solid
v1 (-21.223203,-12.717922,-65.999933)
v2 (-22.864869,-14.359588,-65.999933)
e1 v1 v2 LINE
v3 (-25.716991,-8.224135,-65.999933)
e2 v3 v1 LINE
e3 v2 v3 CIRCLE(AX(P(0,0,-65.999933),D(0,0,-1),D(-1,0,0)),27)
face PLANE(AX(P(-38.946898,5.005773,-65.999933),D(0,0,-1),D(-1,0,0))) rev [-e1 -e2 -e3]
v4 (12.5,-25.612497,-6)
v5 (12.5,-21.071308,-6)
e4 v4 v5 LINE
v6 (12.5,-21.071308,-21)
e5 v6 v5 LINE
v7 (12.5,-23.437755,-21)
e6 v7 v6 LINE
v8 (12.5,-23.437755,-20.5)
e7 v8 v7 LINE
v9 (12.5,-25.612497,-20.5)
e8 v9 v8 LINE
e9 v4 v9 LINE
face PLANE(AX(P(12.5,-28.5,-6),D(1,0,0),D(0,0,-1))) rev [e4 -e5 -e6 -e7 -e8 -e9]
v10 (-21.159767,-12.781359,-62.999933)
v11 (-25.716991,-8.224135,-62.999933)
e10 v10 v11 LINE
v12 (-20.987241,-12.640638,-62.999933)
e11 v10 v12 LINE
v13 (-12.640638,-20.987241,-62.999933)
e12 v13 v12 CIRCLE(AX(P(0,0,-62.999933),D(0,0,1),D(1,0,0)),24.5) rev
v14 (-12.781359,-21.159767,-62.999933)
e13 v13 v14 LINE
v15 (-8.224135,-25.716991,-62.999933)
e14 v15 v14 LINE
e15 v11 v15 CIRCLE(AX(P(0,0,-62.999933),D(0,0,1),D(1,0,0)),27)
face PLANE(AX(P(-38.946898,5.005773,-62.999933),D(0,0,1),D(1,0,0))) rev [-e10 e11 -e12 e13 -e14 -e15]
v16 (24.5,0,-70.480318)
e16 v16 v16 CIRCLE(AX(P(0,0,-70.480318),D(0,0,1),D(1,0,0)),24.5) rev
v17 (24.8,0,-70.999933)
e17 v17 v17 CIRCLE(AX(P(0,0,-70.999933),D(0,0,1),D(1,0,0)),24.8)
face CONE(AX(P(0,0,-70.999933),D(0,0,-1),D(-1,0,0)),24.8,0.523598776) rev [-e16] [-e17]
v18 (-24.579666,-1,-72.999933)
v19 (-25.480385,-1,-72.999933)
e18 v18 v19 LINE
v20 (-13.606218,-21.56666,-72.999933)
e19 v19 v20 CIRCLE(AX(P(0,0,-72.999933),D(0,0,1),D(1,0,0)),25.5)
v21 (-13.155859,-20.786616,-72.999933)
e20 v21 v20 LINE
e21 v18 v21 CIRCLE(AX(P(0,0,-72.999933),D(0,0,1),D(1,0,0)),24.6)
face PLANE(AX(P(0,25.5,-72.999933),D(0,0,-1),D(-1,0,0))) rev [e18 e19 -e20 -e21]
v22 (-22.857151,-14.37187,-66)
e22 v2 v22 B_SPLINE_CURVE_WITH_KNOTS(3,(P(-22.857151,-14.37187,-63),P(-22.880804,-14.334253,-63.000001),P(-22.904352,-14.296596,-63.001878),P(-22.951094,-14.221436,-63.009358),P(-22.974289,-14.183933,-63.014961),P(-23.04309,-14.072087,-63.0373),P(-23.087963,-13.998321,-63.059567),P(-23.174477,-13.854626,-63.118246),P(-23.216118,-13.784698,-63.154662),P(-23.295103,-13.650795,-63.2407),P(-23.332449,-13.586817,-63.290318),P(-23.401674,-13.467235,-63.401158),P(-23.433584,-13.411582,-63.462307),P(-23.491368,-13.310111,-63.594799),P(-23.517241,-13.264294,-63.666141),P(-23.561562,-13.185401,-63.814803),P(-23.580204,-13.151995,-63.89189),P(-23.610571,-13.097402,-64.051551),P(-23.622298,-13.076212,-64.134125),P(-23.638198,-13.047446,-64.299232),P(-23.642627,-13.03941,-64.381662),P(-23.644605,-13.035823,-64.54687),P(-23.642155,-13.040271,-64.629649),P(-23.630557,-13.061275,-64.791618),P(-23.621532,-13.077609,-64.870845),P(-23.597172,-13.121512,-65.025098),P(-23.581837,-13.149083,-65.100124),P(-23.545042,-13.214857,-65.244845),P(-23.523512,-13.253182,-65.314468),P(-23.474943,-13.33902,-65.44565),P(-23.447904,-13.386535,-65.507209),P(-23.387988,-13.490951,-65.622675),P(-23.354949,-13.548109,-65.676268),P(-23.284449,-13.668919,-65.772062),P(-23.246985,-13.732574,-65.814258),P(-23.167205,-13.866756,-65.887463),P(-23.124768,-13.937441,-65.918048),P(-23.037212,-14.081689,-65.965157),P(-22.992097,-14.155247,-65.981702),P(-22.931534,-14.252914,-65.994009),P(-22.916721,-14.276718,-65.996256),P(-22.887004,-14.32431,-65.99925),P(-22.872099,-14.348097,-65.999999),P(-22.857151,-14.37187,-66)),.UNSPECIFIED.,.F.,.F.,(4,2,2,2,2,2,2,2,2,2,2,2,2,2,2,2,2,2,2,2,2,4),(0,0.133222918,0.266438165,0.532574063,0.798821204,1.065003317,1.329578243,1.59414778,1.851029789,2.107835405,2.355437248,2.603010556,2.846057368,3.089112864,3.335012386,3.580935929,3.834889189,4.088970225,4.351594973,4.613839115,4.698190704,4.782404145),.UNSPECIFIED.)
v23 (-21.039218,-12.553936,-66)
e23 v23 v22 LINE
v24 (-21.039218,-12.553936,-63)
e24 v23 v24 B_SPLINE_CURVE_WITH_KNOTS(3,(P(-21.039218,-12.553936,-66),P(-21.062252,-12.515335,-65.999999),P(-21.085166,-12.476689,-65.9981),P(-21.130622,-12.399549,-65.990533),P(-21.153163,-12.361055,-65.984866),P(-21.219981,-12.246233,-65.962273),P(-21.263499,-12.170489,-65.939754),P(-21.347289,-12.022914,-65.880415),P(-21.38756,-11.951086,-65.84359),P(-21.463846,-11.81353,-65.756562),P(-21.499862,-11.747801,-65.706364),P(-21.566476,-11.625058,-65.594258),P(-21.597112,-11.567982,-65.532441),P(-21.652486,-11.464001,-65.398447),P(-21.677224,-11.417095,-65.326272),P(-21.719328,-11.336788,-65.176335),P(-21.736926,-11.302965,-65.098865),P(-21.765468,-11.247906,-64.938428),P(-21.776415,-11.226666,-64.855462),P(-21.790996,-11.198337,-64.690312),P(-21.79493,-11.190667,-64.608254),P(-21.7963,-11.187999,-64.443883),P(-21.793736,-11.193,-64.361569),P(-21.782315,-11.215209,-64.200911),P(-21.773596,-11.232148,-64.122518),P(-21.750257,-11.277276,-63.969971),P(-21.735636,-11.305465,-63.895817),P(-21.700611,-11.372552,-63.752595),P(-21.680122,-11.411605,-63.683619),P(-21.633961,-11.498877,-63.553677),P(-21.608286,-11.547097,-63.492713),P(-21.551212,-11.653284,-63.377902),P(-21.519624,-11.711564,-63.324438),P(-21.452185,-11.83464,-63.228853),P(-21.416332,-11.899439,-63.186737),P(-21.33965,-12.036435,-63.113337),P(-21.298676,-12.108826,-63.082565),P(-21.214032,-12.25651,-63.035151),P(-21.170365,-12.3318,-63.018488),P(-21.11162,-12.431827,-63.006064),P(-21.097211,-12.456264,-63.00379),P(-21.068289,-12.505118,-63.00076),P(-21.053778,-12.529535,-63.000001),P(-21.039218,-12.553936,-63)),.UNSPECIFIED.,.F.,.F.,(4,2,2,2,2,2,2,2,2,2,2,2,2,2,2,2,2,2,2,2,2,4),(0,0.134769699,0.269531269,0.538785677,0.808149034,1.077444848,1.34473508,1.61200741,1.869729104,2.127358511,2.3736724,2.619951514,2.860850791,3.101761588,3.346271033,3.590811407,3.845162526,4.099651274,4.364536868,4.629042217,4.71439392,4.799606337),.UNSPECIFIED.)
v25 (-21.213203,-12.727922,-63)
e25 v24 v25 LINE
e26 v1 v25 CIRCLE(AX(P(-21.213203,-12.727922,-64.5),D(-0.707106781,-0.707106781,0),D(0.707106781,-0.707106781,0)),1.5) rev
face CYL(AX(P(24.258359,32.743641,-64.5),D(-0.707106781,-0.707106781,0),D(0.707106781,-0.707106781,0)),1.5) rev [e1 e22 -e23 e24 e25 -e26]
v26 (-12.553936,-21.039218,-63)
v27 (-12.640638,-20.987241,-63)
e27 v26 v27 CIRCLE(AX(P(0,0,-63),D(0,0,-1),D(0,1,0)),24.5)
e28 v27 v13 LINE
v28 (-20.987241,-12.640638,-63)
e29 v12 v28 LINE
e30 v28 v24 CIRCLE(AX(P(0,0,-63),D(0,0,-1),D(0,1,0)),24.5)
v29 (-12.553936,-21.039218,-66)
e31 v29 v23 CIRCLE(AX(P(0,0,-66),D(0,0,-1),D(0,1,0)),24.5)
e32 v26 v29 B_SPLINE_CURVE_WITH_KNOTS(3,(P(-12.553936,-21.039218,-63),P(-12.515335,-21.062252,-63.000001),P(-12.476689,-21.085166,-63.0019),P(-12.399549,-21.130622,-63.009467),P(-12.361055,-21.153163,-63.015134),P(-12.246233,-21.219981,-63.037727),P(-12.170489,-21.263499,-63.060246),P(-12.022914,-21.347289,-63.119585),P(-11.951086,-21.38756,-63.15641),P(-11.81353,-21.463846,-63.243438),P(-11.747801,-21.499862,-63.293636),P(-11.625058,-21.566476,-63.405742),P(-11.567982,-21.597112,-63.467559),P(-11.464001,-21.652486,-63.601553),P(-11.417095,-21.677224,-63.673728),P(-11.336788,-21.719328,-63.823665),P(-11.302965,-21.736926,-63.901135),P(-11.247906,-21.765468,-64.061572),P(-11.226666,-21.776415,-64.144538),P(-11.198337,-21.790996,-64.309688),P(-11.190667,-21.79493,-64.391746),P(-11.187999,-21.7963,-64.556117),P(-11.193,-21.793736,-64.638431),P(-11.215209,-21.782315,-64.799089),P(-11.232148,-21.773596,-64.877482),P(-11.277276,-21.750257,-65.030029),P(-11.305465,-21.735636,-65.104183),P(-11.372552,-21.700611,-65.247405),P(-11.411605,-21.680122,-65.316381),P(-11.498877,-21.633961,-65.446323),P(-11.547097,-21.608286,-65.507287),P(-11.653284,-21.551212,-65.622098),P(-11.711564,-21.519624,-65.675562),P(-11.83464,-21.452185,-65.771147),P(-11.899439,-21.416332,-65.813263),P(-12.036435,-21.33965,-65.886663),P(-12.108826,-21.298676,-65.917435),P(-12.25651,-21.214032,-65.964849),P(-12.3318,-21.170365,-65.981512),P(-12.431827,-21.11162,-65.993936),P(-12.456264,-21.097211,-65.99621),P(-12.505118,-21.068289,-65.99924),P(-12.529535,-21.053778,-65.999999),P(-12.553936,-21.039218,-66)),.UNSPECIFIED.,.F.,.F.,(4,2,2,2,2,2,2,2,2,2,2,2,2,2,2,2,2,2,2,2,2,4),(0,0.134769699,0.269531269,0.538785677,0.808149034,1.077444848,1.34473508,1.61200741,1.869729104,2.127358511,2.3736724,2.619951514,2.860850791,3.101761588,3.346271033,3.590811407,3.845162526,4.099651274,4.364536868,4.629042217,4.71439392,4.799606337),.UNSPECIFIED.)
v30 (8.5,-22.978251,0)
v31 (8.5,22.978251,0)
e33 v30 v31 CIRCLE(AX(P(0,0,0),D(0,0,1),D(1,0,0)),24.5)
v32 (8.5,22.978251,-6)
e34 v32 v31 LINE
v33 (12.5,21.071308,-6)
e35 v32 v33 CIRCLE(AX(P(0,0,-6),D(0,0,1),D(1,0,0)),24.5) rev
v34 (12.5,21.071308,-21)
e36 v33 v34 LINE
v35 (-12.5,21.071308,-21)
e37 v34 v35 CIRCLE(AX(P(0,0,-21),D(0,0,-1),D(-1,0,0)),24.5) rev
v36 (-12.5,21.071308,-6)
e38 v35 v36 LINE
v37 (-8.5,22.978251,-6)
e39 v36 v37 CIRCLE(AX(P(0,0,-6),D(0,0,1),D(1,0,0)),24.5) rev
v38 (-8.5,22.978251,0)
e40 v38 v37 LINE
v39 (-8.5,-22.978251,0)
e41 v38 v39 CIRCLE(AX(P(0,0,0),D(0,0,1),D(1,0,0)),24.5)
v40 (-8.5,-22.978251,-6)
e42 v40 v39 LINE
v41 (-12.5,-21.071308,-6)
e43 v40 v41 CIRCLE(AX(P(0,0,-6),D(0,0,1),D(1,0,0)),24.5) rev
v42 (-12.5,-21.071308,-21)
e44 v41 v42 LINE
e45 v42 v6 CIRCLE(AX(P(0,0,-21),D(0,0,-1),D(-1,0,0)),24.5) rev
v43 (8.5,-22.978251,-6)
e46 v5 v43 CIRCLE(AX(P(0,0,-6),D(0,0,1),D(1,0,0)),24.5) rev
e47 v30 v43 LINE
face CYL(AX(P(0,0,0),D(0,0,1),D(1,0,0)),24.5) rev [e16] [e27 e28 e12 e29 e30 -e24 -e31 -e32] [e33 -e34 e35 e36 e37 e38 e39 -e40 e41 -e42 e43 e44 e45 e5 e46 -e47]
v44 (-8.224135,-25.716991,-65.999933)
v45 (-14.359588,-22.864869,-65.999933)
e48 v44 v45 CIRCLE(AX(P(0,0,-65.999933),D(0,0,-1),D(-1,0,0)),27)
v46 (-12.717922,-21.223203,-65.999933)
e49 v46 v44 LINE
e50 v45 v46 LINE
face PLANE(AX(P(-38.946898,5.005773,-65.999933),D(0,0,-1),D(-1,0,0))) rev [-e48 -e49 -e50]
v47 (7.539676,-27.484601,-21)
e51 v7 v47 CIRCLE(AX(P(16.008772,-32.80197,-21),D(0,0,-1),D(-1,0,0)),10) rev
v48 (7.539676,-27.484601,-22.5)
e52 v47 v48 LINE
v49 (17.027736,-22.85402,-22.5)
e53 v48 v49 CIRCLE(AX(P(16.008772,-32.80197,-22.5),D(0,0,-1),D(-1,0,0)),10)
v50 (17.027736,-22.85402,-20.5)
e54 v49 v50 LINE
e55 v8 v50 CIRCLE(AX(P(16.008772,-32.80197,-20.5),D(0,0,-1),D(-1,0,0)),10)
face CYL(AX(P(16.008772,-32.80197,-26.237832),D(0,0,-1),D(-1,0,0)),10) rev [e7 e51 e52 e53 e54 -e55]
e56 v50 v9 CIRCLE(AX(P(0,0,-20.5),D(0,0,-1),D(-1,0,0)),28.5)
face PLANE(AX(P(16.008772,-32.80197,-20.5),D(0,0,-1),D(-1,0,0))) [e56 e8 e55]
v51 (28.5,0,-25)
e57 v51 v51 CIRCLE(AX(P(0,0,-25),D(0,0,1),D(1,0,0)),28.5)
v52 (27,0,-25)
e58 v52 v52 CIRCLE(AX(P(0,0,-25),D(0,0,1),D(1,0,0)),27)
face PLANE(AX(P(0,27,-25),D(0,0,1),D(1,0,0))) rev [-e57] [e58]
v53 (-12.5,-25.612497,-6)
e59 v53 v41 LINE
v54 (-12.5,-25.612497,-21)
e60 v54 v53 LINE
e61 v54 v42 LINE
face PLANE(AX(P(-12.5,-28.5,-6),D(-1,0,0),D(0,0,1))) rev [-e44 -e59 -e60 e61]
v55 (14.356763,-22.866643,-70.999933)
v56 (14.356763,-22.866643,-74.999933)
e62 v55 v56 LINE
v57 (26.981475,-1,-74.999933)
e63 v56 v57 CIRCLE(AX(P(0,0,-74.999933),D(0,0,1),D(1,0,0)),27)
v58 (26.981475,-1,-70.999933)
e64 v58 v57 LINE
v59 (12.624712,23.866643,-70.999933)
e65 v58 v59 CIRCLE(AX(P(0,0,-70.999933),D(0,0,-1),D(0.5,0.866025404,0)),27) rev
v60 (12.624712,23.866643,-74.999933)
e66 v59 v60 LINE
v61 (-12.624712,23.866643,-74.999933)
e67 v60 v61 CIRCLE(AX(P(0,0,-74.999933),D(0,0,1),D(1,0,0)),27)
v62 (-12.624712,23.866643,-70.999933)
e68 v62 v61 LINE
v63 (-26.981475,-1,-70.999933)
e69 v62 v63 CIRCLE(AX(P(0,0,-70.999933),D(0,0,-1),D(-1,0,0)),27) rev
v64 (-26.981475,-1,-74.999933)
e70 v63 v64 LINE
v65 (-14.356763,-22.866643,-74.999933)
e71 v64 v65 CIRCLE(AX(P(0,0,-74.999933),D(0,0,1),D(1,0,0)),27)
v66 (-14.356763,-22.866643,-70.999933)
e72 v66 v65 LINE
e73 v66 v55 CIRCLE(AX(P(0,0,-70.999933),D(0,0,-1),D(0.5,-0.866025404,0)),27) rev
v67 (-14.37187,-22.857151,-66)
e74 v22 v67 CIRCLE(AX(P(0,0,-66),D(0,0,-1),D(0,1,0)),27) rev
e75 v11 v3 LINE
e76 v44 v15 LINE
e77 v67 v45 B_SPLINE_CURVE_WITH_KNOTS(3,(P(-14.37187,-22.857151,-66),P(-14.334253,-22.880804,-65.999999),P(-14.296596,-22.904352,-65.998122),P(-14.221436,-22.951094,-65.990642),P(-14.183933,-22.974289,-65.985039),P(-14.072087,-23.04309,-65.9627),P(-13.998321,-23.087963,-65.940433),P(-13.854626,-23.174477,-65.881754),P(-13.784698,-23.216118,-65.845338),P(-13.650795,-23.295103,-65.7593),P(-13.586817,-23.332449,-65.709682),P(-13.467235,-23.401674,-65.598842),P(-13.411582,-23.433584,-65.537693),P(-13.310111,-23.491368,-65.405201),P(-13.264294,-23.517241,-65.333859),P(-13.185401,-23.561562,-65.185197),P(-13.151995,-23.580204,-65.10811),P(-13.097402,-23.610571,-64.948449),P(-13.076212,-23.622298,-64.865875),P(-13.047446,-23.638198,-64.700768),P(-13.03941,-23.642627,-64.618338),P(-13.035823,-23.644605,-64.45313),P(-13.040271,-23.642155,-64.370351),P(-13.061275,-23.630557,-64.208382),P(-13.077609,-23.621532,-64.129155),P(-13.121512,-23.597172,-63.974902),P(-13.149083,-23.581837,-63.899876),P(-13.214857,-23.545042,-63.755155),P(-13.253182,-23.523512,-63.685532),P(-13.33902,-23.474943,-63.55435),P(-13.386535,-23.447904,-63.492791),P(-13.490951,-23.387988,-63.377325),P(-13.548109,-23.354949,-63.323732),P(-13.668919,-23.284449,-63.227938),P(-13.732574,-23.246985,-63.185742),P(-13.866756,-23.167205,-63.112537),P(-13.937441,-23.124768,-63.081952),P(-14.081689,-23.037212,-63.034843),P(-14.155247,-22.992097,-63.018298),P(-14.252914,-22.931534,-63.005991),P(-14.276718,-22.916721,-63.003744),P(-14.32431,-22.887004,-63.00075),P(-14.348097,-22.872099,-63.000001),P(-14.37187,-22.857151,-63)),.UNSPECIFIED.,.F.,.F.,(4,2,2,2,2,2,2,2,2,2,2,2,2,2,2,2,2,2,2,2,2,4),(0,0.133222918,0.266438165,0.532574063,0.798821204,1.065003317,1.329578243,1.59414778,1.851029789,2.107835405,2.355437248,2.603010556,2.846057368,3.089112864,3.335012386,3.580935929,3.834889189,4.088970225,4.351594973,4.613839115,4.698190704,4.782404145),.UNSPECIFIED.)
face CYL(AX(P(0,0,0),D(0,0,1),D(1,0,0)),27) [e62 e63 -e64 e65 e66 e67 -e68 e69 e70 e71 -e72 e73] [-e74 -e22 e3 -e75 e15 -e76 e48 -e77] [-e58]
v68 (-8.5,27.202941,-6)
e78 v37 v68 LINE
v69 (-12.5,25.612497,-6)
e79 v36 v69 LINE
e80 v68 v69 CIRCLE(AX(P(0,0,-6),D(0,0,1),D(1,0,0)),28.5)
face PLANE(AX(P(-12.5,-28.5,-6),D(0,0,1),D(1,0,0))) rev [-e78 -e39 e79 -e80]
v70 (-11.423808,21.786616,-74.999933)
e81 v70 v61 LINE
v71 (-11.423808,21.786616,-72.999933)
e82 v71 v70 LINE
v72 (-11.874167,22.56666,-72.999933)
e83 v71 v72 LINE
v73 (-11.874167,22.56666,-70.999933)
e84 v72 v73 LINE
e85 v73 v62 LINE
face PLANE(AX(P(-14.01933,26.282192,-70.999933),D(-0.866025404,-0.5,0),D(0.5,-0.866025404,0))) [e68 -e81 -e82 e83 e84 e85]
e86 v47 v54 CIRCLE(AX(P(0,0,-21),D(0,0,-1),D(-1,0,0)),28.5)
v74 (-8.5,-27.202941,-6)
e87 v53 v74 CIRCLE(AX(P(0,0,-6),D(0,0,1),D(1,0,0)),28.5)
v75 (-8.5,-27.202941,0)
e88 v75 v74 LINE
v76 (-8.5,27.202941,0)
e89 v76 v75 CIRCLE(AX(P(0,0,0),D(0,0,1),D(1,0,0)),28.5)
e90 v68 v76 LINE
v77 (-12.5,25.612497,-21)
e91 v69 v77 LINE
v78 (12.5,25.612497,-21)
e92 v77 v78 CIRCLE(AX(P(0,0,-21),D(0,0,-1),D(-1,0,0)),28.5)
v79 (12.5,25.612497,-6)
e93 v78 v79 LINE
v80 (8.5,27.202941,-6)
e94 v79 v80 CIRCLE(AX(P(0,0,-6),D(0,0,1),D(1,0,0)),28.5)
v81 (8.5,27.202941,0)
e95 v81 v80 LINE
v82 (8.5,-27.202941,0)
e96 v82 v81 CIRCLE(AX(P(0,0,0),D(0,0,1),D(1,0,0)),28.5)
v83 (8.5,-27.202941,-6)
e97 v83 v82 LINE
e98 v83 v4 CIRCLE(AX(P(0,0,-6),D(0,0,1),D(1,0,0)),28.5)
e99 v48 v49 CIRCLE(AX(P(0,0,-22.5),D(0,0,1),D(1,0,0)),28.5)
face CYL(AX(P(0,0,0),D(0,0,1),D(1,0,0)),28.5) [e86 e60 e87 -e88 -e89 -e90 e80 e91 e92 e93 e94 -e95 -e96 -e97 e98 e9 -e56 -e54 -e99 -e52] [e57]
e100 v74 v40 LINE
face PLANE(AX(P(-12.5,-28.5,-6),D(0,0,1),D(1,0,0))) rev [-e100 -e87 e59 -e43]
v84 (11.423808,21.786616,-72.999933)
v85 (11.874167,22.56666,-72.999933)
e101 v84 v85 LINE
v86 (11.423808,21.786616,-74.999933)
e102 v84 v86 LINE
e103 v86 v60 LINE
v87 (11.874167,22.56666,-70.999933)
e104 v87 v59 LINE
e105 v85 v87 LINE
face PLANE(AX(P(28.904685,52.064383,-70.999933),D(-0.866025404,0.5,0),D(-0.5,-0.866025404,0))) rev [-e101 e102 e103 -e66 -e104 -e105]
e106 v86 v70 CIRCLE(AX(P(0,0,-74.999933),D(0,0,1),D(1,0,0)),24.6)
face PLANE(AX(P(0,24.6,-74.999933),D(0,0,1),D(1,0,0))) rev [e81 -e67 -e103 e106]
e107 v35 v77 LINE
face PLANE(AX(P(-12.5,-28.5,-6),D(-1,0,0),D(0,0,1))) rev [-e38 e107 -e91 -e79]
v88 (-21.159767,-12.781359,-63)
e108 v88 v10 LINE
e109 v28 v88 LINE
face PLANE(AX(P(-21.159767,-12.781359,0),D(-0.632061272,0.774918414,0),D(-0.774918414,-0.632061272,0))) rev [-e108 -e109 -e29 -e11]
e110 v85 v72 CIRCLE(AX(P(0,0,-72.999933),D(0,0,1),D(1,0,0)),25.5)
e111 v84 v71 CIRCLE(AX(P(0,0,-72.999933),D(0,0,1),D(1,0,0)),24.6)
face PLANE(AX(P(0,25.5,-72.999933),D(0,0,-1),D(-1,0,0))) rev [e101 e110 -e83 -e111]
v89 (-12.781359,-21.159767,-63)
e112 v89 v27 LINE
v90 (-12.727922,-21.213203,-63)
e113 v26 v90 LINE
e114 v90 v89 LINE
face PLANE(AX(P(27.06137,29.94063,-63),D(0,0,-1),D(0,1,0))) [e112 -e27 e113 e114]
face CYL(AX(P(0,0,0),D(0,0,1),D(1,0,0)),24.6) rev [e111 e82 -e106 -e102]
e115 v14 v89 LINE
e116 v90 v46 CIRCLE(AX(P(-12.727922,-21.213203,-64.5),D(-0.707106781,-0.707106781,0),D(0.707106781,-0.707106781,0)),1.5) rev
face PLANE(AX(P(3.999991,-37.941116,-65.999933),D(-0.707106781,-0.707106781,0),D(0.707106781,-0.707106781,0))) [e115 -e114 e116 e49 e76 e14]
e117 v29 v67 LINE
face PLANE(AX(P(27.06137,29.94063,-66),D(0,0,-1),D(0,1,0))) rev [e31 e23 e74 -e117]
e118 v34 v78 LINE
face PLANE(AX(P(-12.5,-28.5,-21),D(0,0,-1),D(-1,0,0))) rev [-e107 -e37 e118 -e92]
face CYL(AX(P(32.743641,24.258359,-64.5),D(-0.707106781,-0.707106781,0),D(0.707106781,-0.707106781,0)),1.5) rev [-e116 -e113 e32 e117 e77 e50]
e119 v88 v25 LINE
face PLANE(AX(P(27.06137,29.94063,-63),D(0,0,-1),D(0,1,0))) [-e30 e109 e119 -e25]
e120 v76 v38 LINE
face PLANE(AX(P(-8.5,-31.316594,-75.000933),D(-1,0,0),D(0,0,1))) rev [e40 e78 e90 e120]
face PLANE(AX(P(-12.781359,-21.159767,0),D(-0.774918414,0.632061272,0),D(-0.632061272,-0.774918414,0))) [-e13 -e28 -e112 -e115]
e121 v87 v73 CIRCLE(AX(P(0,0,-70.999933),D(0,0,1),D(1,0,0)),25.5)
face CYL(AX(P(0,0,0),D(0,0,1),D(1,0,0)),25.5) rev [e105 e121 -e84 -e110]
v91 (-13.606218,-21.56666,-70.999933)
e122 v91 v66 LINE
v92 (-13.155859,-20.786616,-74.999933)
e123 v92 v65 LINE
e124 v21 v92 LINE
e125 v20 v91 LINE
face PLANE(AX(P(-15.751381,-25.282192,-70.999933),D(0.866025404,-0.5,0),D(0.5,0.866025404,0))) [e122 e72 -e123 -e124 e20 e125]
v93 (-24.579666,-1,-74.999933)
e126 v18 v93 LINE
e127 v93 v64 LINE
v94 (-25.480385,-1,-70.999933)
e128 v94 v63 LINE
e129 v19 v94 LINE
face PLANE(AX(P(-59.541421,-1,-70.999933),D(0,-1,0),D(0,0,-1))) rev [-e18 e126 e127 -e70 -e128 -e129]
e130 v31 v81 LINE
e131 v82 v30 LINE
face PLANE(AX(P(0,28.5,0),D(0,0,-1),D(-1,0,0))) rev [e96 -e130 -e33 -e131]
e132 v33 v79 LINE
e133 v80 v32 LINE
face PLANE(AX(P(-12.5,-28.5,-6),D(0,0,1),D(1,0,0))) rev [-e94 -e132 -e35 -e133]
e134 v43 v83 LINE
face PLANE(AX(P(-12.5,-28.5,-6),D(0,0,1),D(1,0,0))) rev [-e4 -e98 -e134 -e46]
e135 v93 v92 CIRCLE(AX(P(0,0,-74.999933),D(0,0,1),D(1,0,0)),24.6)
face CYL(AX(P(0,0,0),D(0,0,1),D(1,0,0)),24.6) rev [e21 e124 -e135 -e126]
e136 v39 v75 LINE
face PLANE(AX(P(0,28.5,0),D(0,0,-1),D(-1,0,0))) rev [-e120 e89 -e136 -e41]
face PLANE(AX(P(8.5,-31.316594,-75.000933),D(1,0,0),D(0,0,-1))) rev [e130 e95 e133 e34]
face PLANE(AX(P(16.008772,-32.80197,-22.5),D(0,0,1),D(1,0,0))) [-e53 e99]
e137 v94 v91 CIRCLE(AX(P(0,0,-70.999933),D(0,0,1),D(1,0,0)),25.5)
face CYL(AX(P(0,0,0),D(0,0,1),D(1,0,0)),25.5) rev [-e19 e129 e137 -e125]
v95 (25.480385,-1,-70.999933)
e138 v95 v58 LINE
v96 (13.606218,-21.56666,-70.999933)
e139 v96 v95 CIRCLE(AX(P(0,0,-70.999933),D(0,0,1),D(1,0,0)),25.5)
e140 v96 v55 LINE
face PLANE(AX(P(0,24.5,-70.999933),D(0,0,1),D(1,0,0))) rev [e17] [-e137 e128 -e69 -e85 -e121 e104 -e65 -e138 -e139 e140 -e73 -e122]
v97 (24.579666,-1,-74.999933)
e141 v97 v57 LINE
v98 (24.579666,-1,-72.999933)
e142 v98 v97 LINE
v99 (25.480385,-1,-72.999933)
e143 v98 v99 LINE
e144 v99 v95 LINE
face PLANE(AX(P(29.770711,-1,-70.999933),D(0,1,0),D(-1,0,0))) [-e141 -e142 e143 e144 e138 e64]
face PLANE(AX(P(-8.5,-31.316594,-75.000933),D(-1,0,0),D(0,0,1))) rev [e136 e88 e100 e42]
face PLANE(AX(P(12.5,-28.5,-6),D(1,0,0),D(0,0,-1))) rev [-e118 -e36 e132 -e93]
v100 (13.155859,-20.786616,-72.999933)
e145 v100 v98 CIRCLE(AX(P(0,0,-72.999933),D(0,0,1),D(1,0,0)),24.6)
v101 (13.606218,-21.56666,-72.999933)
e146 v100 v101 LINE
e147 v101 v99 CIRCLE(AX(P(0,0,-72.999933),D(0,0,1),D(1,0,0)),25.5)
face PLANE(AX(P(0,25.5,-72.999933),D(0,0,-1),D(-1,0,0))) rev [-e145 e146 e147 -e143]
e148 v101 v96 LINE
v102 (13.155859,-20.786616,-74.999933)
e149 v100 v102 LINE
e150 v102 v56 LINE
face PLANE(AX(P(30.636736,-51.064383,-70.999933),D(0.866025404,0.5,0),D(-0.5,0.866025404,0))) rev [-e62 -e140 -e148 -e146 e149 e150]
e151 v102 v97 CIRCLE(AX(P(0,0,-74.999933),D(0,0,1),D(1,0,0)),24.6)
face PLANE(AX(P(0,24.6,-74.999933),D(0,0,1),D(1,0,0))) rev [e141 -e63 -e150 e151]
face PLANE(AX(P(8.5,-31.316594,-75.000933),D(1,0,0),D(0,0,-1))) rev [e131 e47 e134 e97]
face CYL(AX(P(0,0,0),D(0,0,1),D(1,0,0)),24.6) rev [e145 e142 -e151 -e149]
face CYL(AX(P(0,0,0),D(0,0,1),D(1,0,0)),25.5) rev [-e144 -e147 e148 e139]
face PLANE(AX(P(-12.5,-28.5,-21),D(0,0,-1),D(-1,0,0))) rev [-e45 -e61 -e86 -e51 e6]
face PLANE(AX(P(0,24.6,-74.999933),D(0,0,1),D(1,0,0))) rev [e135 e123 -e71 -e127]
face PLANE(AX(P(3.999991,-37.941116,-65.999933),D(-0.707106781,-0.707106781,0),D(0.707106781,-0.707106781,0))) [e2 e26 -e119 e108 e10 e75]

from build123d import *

# Parameters (mm, degrees)
CUT_EXTRUDE_4_DEPTH      = 4
PATTERN_CIRCULAR_1_COUNT = 3
CUT_EXTRUDE_7_DEPTH      = 86.143936954
CUT_EXTRUDE_7_DEPTH_BACK = 86.143936954
SKETCH_12_W              = 25
SKETCH_12_H              = 15
CUT_EXTRUDE_START        = -6
SKETCH_13_W              = 17
SKETCH_13_H              = 62.633188826
CUT_EXTRUDE_12_DEPTH     = 6
CHAMFER_2_SIZE           = 0.3
CHAMFER_2_SIZE2          = 0.519615242
SKETCH_14_W              = 2
SKETCH_14_H              = 10
SKETCH_16_W              = 3
SKETCH_16_H              = 60.736072742
CUT_EXTRUDE_14_DEPTH     = 3
CHAMFER_3_SIZE           = 1
CUT_EXTRUDE_13_REACH     = 102.772


with BuildPart() as part:
    # Эскиз1 → Повернуть1 (revolve)
    with BuildSketch(Plane(origin=(0, 0, 0), x_dir=(0, 0, -1), z_dir=(1, 0, 0)), mode=Mode.PRIVATE) as revolve_1_sk:
        Polygon((0, 24.5), (70.999933333, 24.5), (70.999933333, 25.5), (72.999933333, 25.5), (72.999933333, 24.6), (74.999933333, 24.6), (74.999933333, 27), (25, 27), (25, 28.5), (0, 28.5), align=None)
    revolve(revolve_1_sk.sketch.rotate(Axis((0, 0, 0), (0, 0, -1)), 90), axis=Axis((0, 0, 0), (0, 0, -1)))

    # Эскиз9 → Вырез-Вытянуть4 (cut)
    with BuildSketch(Plane(origin=(0, 0, -74.999933333), x_dir=(-1, 0, 0), z_dir=(0, 0, -1))):
        with BuildLine():
            ThreePointArc((24.6, 0), (24.594916073, -0.500103353), (24.579666393, -1))
            Line((24.579666393, -1), (26.981475126, -1))
            ThreePointArc((26.981475126, -1), (26.995368384, -0.500085785), (27, 0))
            ThreePointArc((27, 0), (23.128631913, 13.930771186), (12.624712159, 23.866642891))
            Line((12.624712159, 23.866642891), (11.423807793, 21.786615513))
            ThreePointArc((11.423807793, 21.786615513), (21.049770447, 12.730560245), (24.6, 0))
        make_face()
    cut_extrude_4 = extrude(amount=-CUT_EXTRUDE_4_DEPTH, mode=Mode.SUBTRACT)

    # Круговой массив1: Вырез-Вытянуть4 ×3 about axis
    pattern_circular_1_axis = Axis((0, 0, 0), (0, 0, 1))
    for i in range(1, PATTERN_CIRCULAR_1_COUNT):
        add(cut_extrude_4.rotate(pattern_circular_1_axis, i * 360 / PATTERN_CIRCULAR_1_COUNT), mode=Mode.SUBTRACT)

    # Эскиз12 → Вырез-Вытянуть7 (cut, two sides: drawn at the far end of the back side and taken through both)
    with BuildSketch(Plane(origin=(0, 0, 0), x_dir=(1, 0, 0), z_dir=(0, 1, 0)).offset(-CUT_EXTRUDE_7_DEPTH_BACK)):
        with Locations((0, 13.5)):
            Rectangle(SKETCH_12_W, SKETCH_12_H)
    extrude(amount=CUT_EXTRUDE_7_DEPTH + CUT_EXTRUDE_7_DEPTH_BACK, mode=Mode.SUBTRACT)

    # Эскиз13 → Вырез-Вытянуть12 (cut)
    with BuildSketch(Plane.XY.offset(CUT_EXTRUDE_START)):
        Rectangle(SKETCH_13_W, SKETCH_13_H)
    extrude(amount=CUT_EXTRUDE_12_DEPTH, mode=Mode.SUBTRACT)

    # Фаска2
    chamfer_2_edges = [part.edges().sort_by_distance(p)[0] for p in [
        (-24.5, 0, -70.999933333),
    ]]
    chamfer_2_side = [part.faces().sort_by_distance(p)[0] for p in [
        (0, 24.746856587, -70.999933333),
    ]]
    chamfer(chamfer_2_edges, length=CHAMFER_2_SIZE, length2=CHAMFER_2_SIZE2, reference=chamfer_2_side[0])

    # Эскиз14 → Вырез-Повернуть1 (revolve, cut)
    with BuildSketch(Plane(origin=(0, 0, 0), x_dir=(0, 0, 1), z_dir=(-0.8986841034993474, -0.4385964912280702, 0))):
        with Locations((-21.5, -31.5)):
            Rectangle(SKETCH_14_W, SKETCH_14_H)
    revolve(axis=Axis((16.00877193, -32.801969778, -26.23783224), (0, 0, 1)), mode=Mode.SUBTRACT)

    # Эскиз16 → Вырез-Вытянуть14 (cut)
    with BuildSketch(Plane(origin=(-19.091883092, -19.091883092, 0), x_dir=(0, 0, 1), z_dir=(-0.7071067811865464, -0.7071067811865488, 0))):
        with Locations((-64.499933333, 0.711195231)):
            Rectangle(SKETCH_16_W, SKETCH_16_H)
    extrude(amount=-CUT_EXTRUDE_14_DEPTH, mode=Mode.SUBTRACT)

    # Фаска3
    # the kernel refuses this chamfer: 1 mm, written as the material it takes off along each edge
    with BuildSketch(Plane(origin=(-20.452659818, -13.488465679, -62.999933333), x_dir=(-0.5333586097594283, 0.8458892323439812, 0), z_dir=(0, 0, -1))) as chamfer_3_piece_1:
        with BuildLine():
            Line((1.002291345, 0), (CHAMFER_3_SIZE * 0.975275502088, -CHAMFER_3_SIZE * 0.220992522558))
            Line((CHAMFER_3_SIZE * 0.975275502088, -CHAMFER_3_SIZE * 0.220992522558), (0, 0))
            ThreePointArc((0, 0), (0.503575038, -0.005125864), (1.002291345, 0))
        make_face()
    extrude(amount=3, mode=Mode.SUBTRACT)
    with BuildSketch(Plane(origin=(-13.488465679, -20.452659818, -62.999933333), x_dir=(0.8458892323439845, -0.5333586097594231, 0), z_dir=(0, 0, -1))) as chamfer_3_piece_2:
        with BuildLine():
            Line((1.002291345, 0), (CHAMFER_3_SIZE * 0.975275502088, CHAMFER_3_SIZE * 0.220992522558))
            Line((CHAMFER_3_SIZE * 0.975275502088, CHAMFER_3_SIZE * 0.220992522558), (0, 0))
            ThreePointArc((0, 0), (0.503575038, 0.005125864), (1.002291345, 0))
        make_face()
    extrude(amount=3, mode=Mode.SUBTRACT)

    # Эскиз15 → Вырез-Вытянуть13 (cut, up to next)
    with BuildSketch(Plane(origin=(-19.091883092, -19.091883092, 0), x_dir=(0, 0, 1), z_dir=(-0.7071067811865464, -0.7071067811865488, 0)), mode=Mode.PRIVATE) as cut_extrude_13_sk1:
        with BuildLine():
            Line((-63, 6), (-63, -6))
            ThreePointArc((-63, -6), (-64.5, -7.5), (-66, -6))
            Line((-66, -6), (-66, 6))
            ThreePointArc((-66, 6), (-64.5, 7.5), (-63, 6))
        make_face()
    cut_extrude_13_tool1 = extrude(cut_extrude_13_sk1.sketch, amount=-CUT_EXTRUDE_13_REACH, mode=Mode.PRIVATE) & part.part
    add(cut_extrude_13_tool1.solids().sort_by_distance((-19.091883, -19.091883, -64.5))[0], mode=Mode.SUBTRACT)


solid = part.part
